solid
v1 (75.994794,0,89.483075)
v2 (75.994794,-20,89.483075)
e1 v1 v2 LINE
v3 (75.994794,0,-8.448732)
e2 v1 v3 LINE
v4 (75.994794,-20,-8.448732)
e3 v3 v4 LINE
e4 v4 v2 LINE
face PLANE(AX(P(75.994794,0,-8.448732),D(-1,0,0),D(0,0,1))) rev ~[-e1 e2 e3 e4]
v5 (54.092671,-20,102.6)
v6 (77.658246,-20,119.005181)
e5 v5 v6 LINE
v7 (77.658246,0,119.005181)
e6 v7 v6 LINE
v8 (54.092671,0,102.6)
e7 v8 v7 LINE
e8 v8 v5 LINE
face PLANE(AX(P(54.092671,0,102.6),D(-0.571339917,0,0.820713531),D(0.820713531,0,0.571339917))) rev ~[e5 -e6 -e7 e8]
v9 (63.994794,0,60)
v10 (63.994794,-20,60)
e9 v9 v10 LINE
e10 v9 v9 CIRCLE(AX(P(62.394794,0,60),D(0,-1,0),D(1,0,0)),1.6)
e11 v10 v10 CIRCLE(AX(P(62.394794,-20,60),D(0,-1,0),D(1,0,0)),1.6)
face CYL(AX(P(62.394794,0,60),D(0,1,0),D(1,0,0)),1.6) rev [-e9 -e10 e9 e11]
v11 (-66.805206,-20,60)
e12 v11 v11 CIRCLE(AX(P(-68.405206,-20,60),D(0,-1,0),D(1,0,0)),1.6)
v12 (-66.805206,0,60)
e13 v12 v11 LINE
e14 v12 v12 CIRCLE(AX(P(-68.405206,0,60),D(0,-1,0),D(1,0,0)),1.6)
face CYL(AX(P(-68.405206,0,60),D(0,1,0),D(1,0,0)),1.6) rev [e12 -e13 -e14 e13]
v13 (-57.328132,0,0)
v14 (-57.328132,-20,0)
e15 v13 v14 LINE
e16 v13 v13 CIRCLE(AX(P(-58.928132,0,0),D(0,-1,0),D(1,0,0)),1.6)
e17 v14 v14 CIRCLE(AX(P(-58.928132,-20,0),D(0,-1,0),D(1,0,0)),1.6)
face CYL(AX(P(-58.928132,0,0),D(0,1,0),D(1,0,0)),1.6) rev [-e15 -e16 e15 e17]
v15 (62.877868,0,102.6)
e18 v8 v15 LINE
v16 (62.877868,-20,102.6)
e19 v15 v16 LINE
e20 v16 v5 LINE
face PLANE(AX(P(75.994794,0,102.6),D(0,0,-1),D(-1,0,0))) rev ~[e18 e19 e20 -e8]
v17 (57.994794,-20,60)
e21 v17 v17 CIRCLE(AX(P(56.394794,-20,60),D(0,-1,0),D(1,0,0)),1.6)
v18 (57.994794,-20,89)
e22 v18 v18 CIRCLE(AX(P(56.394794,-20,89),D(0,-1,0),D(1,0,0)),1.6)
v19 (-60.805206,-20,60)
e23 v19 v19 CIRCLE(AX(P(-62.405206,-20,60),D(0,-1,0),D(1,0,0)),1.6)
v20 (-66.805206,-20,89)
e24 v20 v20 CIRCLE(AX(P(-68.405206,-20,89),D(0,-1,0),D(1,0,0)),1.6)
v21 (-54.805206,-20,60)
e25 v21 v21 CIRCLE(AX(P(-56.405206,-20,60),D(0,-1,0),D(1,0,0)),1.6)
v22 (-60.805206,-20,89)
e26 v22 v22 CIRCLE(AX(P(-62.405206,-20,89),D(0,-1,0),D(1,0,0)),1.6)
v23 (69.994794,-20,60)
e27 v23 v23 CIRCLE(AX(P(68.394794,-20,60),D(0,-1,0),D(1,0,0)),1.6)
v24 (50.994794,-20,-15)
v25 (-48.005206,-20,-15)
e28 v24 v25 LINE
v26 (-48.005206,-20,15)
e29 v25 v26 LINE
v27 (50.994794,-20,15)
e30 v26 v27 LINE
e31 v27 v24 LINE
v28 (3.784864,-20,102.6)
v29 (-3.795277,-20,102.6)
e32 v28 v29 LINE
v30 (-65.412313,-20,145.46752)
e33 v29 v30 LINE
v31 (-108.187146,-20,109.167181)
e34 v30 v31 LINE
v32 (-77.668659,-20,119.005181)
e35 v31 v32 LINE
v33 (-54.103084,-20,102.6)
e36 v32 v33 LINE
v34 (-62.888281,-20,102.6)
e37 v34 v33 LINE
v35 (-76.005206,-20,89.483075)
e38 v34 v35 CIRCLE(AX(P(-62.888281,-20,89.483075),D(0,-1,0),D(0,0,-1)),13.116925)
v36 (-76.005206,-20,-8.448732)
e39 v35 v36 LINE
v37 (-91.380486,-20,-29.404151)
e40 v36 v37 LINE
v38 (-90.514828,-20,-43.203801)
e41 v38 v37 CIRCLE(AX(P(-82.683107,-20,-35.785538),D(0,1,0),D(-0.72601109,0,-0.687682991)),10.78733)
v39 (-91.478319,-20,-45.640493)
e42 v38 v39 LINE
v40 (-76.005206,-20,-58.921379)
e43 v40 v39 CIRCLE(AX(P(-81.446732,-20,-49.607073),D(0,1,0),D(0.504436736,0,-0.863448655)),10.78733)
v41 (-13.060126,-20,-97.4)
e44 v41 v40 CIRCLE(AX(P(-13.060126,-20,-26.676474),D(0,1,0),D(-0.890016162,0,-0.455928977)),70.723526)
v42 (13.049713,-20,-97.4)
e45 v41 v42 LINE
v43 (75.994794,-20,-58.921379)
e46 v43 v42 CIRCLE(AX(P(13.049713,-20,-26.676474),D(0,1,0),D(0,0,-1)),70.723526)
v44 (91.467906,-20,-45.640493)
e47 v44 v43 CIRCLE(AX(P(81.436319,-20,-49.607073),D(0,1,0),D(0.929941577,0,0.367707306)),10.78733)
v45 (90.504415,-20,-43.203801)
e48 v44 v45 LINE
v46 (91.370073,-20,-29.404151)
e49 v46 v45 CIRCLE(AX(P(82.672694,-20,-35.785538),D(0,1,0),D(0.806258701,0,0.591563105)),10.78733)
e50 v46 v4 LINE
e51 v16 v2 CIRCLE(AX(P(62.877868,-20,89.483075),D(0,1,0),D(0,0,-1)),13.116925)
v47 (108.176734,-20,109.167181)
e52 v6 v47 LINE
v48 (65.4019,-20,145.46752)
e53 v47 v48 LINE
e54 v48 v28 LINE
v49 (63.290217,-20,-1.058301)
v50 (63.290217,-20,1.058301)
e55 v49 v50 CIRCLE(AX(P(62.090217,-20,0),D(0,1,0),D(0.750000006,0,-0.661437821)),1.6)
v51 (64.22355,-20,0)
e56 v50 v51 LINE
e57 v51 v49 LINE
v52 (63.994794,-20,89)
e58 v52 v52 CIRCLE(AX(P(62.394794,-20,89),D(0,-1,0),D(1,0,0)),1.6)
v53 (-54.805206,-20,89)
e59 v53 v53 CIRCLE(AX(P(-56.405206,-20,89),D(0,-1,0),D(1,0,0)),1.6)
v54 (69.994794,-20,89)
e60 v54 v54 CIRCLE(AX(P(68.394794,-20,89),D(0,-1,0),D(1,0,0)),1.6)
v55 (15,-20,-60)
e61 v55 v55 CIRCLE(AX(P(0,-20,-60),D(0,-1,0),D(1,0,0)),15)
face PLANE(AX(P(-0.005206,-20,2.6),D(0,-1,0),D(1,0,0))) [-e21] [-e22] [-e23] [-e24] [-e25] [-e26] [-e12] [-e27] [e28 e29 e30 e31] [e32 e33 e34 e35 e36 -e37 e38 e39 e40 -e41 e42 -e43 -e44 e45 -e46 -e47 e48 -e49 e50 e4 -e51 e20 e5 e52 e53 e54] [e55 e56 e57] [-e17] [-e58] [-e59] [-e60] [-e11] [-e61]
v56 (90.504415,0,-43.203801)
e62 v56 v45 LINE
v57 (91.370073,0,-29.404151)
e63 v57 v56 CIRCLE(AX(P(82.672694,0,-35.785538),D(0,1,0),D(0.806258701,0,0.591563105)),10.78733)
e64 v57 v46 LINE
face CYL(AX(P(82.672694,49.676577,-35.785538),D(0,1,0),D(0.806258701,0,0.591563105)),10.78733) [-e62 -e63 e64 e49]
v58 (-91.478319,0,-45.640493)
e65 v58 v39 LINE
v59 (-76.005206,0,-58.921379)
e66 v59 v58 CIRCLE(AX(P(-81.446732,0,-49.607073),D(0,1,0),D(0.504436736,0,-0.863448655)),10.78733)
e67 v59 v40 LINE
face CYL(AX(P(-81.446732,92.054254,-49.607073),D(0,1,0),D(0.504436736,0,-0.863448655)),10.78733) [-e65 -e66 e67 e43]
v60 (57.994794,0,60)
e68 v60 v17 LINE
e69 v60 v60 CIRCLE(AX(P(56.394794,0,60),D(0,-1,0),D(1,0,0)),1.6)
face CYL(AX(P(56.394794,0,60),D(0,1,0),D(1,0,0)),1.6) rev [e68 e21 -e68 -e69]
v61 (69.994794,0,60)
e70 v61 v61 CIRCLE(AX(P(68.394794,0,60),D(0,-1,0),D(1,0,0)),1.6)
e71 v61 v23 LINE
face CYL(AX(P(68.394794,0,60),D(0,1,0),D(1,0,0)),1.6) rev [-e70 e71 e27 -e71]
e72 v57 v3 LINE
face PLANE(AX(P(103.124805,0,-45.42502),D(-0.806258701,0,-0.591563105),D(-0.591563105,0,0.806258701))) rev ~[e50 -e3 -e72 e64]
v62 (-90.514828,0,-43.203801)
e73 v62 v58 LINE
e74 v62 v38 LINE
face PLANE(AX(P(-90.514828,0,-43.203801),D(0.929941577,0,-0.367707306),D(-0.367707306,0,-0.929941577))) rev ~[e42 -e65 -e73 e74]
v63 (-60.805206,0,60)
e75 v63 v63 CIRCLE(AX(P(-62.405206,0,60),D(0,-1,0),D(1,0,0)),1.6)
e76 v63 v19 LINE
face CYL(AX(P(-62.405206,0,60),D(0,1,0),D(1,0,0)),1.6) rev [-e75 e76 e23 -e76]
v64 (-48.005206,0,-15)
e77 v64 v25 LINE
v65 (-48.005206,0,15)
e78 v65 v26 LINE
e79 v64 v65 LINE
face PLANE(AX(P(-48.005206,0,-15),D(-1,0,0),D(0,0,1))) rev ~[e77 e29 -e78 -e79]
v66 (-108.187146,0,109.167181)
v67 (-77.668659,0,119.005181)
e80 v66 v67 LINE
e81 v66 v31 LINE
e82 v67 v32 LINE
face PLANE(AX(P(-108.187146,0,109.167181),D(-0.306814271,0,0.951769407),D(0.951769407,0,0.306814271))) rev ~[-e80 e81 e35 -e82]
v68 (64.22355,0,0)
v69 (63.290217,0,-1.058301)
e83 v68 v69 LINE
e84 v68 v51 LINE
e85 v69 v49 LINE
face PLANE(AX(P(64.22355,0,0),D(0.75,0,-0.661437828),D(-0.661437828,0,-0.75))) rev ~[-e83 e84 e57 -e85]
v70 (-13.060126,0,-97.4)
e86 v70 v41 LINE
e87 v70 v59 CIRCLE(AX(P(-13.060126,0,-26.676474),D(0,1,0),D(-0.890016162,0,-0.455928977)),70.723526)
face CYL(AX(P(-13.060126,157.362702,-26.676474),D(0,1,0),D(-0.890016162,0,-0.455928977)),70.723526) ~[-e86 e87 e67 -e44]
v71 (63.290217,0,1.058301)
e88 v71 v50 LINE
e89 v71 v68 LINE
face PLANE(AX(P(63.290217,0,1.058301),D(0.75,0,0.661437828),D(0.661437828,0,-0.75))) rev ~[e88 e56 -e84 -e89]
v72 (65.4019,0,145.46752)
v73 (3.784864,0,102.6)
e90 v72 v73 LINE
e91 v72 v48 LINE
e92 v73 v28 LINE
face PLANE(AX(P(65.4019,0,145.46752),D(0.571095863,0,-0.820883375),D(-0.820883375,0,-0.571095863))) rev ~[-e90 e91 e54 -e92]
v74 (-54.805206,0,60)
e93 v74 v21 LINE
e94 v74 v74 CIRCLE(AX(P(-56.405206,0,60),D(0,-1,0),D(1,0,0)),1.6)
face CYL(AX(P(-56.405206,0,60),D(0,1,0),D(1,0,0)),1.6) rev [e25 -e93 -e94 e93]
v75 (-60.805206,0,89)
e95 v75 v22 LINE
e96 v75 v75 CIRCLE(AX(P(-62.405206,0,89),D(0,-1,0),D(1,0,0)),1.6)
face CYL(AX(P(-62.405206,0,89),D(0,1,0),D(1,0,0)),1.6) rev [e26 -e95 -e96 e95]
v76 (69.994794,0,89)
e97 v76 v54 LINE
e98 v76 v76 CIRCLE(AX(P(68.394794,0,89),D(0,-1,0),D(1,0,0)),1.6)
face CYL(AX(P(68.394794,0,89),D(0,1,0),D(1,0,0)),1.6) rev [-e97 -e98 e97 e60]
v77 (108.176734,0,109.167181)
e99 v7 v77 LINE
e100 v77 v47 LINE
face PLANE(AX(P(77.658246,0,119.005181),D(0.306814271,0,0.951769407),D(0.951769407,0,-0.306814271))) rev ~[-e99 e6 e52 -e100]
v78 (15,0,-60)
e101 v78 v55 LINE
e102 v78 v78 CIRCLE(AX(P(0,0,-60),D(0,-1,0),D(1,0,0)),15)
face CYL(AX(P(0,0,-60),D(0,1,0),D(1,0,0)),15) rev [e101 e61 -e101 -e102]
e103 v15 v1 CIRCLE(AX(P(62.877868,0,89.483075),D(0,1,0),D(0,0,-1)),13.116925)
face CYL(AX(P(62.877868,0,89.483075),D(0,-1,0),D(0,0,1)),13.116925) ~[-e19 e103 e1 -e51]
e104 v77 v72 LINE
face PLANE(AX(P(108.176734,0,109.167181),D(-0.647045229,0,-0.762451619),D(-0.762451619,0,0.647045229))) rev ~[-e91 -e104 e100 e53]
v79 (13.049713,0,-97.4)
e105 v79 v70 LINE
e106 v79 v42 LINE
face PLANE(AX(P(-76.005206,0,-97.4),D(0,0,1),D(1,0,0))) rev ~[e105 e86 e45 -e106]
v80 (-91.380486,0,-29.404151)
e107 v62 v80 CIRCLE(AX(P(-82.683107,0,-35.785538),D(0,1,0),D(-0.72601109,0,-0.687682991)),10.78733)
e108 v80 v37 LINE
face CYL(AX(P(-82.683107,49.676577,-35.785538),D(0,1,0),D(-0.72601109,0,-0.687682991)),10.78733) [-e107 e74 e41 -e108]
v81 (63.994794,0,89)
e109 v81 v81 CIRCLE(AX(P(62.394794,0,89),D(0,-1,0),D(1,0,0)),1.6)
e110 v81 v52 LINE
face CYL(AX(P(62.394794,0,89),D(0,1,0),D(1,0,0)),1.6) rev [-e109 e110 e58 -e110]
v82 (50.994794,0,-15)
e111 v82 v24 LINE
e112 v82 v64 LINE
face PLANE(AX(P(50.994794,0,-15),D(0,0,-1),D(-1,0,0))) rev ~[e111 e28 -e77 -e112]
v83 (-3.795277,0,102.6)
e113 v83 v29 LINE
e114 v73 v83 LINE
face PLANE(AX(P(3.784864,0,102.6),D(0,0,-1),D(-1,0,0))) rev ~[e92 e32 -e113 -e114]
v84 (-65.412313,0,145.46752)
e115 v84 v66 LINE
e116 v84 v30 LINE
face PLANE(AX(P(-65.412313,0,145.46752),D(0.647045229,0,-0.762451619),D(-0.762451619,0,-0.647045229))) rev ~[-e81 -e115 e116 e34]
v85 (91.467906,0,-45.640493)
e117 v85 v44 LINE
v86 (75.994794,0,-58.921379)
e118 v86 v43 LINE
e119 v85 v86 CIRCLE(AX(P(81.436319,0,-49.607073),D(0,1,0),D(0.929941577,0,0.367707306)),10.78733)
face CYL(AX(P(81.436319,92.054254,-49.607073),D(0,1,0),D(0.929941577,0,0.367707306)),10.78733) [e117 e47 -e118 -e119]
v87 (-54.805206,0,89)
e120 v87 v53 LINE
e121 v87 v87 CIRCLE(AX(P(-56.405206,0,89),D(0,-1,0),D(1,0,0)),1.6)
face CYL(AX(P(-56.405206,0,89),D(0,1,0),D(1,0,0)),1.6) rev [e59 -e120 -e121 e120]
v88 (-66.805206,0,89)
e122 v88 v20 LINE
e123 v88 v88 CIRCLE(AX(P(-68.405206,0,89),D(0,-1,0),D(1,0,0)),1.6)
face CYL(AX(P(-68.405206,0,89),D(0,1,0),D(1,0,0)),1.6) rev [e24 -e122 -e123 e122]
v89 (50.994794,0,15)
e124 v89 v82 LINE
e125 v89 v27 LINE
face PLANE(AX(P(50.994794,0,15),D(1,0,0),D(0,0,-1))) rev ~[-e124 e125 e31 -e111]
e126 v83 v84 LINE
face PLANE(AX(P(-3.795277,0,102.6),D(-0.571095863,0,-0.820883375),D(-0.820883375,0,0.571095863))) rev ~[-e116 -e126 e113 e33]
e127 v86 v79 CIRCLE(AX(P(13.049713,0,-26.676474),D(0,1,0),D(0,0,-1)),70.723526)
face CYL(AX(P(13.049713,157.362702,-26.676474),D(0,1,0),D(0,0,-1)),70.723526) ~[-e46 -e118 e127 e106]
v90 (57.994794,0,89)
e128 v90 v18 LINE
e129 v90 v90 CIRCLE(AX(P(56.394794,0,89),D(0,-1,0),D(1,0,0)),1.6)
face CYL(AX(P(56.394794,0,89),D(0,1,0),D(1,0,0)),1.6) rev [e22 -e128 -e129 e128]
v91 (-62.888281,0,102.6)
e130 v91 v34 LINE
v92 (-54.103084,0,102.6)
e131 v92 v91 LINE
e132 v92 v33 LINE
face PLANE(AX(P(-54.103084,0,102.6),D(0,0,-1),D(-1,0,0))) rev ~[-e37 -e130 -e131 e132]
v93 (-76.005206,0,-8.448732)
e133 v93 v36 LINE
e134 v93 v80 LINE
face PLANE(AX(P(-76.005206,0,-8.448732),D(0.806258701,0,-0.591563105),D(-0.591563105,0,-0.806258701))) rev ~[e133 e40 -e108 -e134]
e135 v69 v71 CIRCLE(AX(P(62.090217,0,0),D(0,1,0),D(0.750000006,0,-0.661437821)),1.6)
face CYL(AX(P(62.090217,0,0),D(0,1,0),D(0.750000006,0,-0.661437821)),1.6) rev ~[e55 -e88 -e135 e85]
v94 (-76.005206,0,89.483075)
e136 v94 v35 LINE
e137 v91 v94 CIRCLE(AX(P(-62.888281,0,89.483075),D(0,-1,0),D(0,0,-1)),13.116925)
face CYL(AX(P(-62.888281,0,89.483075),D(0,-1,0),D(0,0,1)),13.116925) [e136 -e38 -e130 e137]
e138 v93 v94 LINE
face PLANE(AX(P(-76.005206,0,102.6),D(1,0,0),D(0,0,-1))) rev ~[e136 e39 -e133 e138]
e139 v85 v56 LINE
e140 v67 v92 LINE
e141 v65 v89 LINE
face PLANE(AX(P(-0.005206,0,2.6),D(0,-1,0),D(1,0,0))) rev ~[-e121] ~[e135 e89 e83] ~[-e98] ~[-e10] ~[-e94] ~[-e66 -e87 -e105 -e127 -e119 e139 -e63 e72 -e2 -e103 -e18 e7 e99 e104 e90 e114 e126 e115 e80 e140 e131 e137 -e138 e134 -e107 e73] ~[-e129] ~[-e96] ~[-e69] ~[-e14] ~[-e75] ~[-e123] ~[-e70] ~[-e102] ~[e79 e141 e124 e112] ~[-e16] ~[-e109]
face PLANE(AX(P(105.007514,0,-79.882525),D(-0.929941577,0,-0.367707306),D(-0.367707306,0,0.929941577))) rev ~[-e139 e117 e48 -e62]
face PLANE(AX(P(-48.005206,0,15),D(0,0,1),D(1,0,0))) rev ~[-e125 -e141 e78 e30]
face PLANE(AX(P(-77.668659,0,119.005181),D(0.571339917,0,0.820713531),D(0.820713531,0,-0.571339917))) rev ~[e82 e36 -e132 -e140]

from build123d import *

# Parameters (mm, degrees)
F0_R        = 15
F0_R_2      = 1.6
F1_DEPTH    = 20
F2_R        = 11.6045153918
F3_DEPTH    = 20
F4_T1_DEPTH = 334.7254047122
F6_R        = 13.1169251871
F7_T1_DEPTH = 119.353153646
F7_T3_DEPTH = 204.1085089788


# Not quite as in the source:
# - a fillet or chamfer that OpenCascade refuses, or shapes differently, is made with other operations: its cross-section is extruded or revolved along the edge and cut away or added


with BuildPart() as f1:
    # F0 (on Front) → F1 (new body)
    with BuildSketch(Plane.XZ):
        Polygon((-54.1030839086, 102.6), (-76.0052064898, 102.6), (-76.0052064898, -8.4487323015), (-76.0052064898, -58.9213789776), (-76.0052064898, -97.4), (75.9947935102, -97.4), (75.9947935102, -58.9213789776), (75.9947935102, -8.4487323015), (75.9947935102, 102.6), (54.0926709289, 102.6), (3.7848638975, 102.6), (-0.0052064898, 102.6), (-3.7952768771, 102.6), align=None)
        with Locations((0, -60)):
            Circle(F0_R, mode=Mode.SUBTRACT)
        Polygon((-48.0052064898, 15), (-0.0052064898, 15), (50.9947935102, 15), (63.2902167228, 1.058300535), (64.2235500655, 0), (63.2902167424, -1.0583005129), (50.9947935102, -15), (-48.0052064898, -15), (-61.2339630452, 0), align=None, mode=Mode.SUBTRACT)
        with Locations((-68.4052064898, 60)):
            Circle(F0_R_2, mode=Mode.SUBTRACT)
        with Locations((-62.4052064898, 60)):
            Circle(F0_R_2, mode=Mode.SUBTRACT)
        with Locations((-56.4052064898, 60)):
            Circle(F0_R_2, mode=Mode.SUBTRACT)
        with Locations((-68.4052064898, 89)):
            Circle(F0_R_2, mode=Mode.SUBTRACT)
        with Locations((-62.4052064898, 89)):
            Circle(F0_R_2, mode=Mode.SUBTRACT)
        with Locations((-56.4052064898, 89)):
            Circle(F0_R_2, mode=Mode.SUBTRACT)
        with Locations((56.3947935102, 60)):
            Circle(F0_R_2, mode=Mode.SUBTRACT)
        with Locations((62.3947935102, 60)):
            Circle(F0_R_2, mode=Mode.SUBTRACT)
        with Locations((68.3947935102, 60)):
            Circle(F0_R_2, mode=Mode.SUBTRACT)
        with Locations((56.3947935102, 89)):
            Circle(F0_R_2, mode=Mode.SUBTRACT)
        with Locations((62.3947935102, 89)):
            Circle(F0_R_2, mode=Mode.SUBTRACT)
        with Locations((68.3947935102, 89)):
            Circle(F0_R_2, mode=Mode.SUBTRACT)
        Polygon((-77.668659389, 119.0051808953), (-54.1030839086, 102.6), (-3.7952768771, 102.6), (-65.412312746, 145.4675197601), (-108.1871464849, 109.1671809554), align=None)
        Polygon((-76.0052064898, -58.9213789776), (-76.0052064898, -8.4487323015), (-103.1352177745, -45.4250201583), (-90.5148283129, -43.2038009167), (-105.0179273372, -79.8825249076), align=None)
        Polygon((65.4018997664, 145.4675197601), (3.7848638975, 102.6), (54.0926709289, 102.6), (77.6582464094, 119.0051808953), (108.1767335052, 109.1671809554), align=None)
        Polygon((75.9947935102, -8.4487323015), (75.9947935102, -58.9213789776), (105.0075143576, -79.8825249076), (90.5044153333, -43.2038009167), (103.1248047948, -45.4250201583), align=None)
        with BuildLine():
            Line((63.2902167228, 1.058300535), (50.9947935102, 15))
            Line((50.9947935102, 15), (50.9947935102, -15))
            Line((50.9947935102, -15), (63.2902167424, -1.0583005129))
            ThreePointArc((63.2902167424, -1.0583005129), (60.4902167322, -1.48e-08), (63.2902167228, 1.058300535))
        make_face()
        Polygon((-48.0052064898, -15), (-48.0052064898, 15), (-61.2339630452, 0), align=None)
        with Locations((-58.9281324463, 0)):
            Circle(F0_R_2, mode=Mode.SUBTRACT)
    extrude(amount=F1_DEPTH)

    # F2
    f2_edges = [f1.edges().sort_by_distance(p)[0] for p in [
        (-76.005206, -10, 102.6),
        (-76.005206, -10, -97.4),
        (75.994794, -10, -97.4),
        (75.994794, -10, 102.6),
    ]]
    fillet(f2_edges, radius=F2_R)

    # F0 (on Front) → F3 (join)
    with BuildSketch(Plane.XZ):
        Polygon((-54.1030839086, 102.6), (-76.0052064898, 102.6), (-76.0052064898, -8.4487323015), (-76.0052064898, -58.9213789776), (-76.0052064898, -97.4), (75.9947935102, -97.4), (75.9947935102, -58.9213789776), (75.9947935102, -8.4487323015), (75.9947935102, 102.6), (54.0926709289, 102.6), (3.7848638975, 102.6), (-0.0052064898, 102.6), (-3.7952768771, 102.6), align=None)
        with Locations((0, -60)):
            Circle(F0_R, mode=Mode.SUBTRACT)
        Polygon((-48.0052064898, 15), (-0.0052064898, 15), (50.9947935102, 15), (63.2902167228, 1.058300535), (64.2235500655, 0), (63.2902167424, -1.0583005129), (50.9947935102, -15), (-48.0052064898, -15), (-61.2339630452, 0), align=None, mode=Mode.SUBTRACT)
        with Locations((-68.4052064898, 60)):
            Circle(F0_R_2, mode=Mode.SUBTRACT)
        with Locations((-62.4052064898, 60)):
            Circle(F0_R_2, mode=Mode.SUBTRACT)
        with Locations((-56.4052064898, 60)):
            Circle(F0_R_2, mode=Mode.SUBTRACT)
        with Locations((-68.4052064898, 89)):
            Circle(F0_R_2, mode=Mode.SUBTRACT)
        with Locations((-62.4052064898, 89)):
            Circle(F0_R_2, mode=Mode.SUBTRACT)
        with Locations((-56.4052064898, 89)):
            Circle(F0_R_2, mode=Mode.SUBTRACT)
        with Locations((56.3947935102, 60)):
            Circle(F0_R_2, mode=Mode.SUBTRACT)
        with Locations((62.3947935102, 60)):
            Circle(F0_R_2, mode=Mode.SUBTRACT)
        with Locations((68.3947935102, 60)):
            Circle(F0_R_2, mode=Mode.SUBTRACT)
        with Locations((56.3947935102, 89)):
            Circle(F0_R_2, mode=Mode.SUBTRACT)
        with Locations((62.3947935102, 89)):
            Circle(F0_R_2, mode=Mode.SUBTRACT)
        with Locations((68.3947935102, 89)):
            Circle(F0_R_2, mode=Mode.SUBTRACT)
        Polygon((-77.668659389, 119.0051808953), (-54.1030839086, 102.6), (-3.7952768771, 102.6), (-65.412312746, 145.4675197601), (-108.1871464849, 109.1671809554), align=None)
        Polygon((-76.0052064898, -58.9213789776), (-76.0052064898, -8.4487323015), (-103.1352177745, -45.4250201583), (-90.5148283129, -43.2038009167), (-105.0179273372, -79.8825249076), align=None)
        Polygon((65.4018997664, 145.4675197601), (3.7848638975, 102.6), (54.0926709289, 102.6), (77.6582464094, 119.0051808953), (108.1767335052, 109.1671809554), align=None)
        Polygon((75.9947935102, -8.4487323015), (75.9947935102, -58.9213789776), (105.0075143576, -79.8825249076), (90.5044153333, -43.2038009167), (103.1248047948, -45.4250201583), align=None)
        Polygon((-48.0052064898, -15), (-48.0052064898, 15), (-61.2339630452, 0), align=None)
        with Locations((-58.9281324463, 0)):
            Circle(F0_R_2, mode=Mode.SUBTRACT)
        with BuildLine():
            Line((63.2902167228, 1.058300535), (50.9947935102, 15))
            Line((50.9947935102, 15), (50.9947935102, -15))
            Line((50.9947935102, -15), (63.2902167424, -1.0583005129))
            ThreePointArc((63.2902167424, -1.0583005129), (60.4902167322, -1.48e-08), (63.2902167228, 1.058300535))
        make_face()
    extrude(amount=F3_DEPTH)

    # F4: fillet of radius 70.723525766 on 2 edges, made by hand

    # F4_s2 → F4_t1 (cut)
    with BuildSketch(Plane.XZ.offset(-157.3627023561)):
        with BuildLine():
            ThreePointArc((-76.0052064898, -58.9213789776), (-49.9474116045, -87.018376956), (-13.0601255474, -97.4))
            Line((-13.0601255474, -97.4), (-76.0052064898, -97.4))
            Line((-76.0052064898, -97.4), (-76.0052064898, -58.9213789776))
        make_face()
        with BuildLine():
            ThreePointArc((13.0497125677, -97.4), (49.9369986248, -87.018376956), (75.9947935102, -58.9213789776))
            Line((75.9947935102, -58.9213789776), (75.9947935102, -97.4))
            Line((75.9947935102, -97.4), (13.0497125677, -97.4))
        make_face()
    extrude(amount=F4_T1_DEPTH, mode=Mode.SUBTRACT)

    # F6
    f6_edges = [f1.edges().sort_by_distance(p)[0] for p in [
        (75.994794, -10, 102.6),
        (-76.005206, -10, 102.6),
    ]]
    fillet(f6_edges, radius=F6_R)

    # F7: fillet of radius 10.7873299095 on 4 edges, made by hand

    # F7_s2 → F7_t1 (cut)
    with BuildSketch(Plane.XZ.offset(-49.676576823)):
        with BuildLine():
            ThreePointArc((91.3700727829, -29.4041512397), (93.4388619061, -36.4609035493), (90.5044153333, -43.2038009167))
            Line((90.5044153333, -43.2038009167), (103.1248047948, -45.4250201583))
            Line((103.1248047948, -45.4250201583), (91.3700727829, -29.4041512397))
        make_face()
        with BuildLine():
            ThreePointArc((-90.5148283129, -43.2038009167), (-93.4492748858, -36.4609035493), (-91.3804857626, -29.4041512397))
            Line((-91.3804857626, -29.4041512397), (-103.1352177745, -45.4250201583))
            Line((-103.1352177745, -45.4250201583), (-90.5148283129, -43.2038009167))
        make_face()
    extrude(amount=F7_T1_DEPTH, mode=Mode.SUBTRACT)

    # F7_s4 → F7_t3 (cut)
    with BuildSketch(Plane.XZ.offset(-92.0542544894)):
        with BuildLine():
            ThreePointArc((-76.0052064898, -58.9213789776), (-88.4725874625, -57.7926608942), (-91.4783185714, -45.6404934608))
            Line((-91.4783185714, -45.6404934608), (-105.0179273372, -79.8825249076))
            Line((-105.0179273372, -79.8825249076), (-76.0052064898, -58.9213789776))
        make_face()
        with BuildLine():
            ThreePointArc((91.4679055918, -45.6404934608), (88.4621744828, -57.7926608942), (75.9947935102, -58.9213789776))
            Line((75.9947935102, -58.9213789776), (105.0075143576, -79.8825249076))
            Line((105.0075143576, -79.8825249076), (91.4679055918, -45.6404934608))
        make_face()
    extrude(amount=F7_T3_DEPTH, mode=Mode.SUBTRACT)


solid = f1.part
